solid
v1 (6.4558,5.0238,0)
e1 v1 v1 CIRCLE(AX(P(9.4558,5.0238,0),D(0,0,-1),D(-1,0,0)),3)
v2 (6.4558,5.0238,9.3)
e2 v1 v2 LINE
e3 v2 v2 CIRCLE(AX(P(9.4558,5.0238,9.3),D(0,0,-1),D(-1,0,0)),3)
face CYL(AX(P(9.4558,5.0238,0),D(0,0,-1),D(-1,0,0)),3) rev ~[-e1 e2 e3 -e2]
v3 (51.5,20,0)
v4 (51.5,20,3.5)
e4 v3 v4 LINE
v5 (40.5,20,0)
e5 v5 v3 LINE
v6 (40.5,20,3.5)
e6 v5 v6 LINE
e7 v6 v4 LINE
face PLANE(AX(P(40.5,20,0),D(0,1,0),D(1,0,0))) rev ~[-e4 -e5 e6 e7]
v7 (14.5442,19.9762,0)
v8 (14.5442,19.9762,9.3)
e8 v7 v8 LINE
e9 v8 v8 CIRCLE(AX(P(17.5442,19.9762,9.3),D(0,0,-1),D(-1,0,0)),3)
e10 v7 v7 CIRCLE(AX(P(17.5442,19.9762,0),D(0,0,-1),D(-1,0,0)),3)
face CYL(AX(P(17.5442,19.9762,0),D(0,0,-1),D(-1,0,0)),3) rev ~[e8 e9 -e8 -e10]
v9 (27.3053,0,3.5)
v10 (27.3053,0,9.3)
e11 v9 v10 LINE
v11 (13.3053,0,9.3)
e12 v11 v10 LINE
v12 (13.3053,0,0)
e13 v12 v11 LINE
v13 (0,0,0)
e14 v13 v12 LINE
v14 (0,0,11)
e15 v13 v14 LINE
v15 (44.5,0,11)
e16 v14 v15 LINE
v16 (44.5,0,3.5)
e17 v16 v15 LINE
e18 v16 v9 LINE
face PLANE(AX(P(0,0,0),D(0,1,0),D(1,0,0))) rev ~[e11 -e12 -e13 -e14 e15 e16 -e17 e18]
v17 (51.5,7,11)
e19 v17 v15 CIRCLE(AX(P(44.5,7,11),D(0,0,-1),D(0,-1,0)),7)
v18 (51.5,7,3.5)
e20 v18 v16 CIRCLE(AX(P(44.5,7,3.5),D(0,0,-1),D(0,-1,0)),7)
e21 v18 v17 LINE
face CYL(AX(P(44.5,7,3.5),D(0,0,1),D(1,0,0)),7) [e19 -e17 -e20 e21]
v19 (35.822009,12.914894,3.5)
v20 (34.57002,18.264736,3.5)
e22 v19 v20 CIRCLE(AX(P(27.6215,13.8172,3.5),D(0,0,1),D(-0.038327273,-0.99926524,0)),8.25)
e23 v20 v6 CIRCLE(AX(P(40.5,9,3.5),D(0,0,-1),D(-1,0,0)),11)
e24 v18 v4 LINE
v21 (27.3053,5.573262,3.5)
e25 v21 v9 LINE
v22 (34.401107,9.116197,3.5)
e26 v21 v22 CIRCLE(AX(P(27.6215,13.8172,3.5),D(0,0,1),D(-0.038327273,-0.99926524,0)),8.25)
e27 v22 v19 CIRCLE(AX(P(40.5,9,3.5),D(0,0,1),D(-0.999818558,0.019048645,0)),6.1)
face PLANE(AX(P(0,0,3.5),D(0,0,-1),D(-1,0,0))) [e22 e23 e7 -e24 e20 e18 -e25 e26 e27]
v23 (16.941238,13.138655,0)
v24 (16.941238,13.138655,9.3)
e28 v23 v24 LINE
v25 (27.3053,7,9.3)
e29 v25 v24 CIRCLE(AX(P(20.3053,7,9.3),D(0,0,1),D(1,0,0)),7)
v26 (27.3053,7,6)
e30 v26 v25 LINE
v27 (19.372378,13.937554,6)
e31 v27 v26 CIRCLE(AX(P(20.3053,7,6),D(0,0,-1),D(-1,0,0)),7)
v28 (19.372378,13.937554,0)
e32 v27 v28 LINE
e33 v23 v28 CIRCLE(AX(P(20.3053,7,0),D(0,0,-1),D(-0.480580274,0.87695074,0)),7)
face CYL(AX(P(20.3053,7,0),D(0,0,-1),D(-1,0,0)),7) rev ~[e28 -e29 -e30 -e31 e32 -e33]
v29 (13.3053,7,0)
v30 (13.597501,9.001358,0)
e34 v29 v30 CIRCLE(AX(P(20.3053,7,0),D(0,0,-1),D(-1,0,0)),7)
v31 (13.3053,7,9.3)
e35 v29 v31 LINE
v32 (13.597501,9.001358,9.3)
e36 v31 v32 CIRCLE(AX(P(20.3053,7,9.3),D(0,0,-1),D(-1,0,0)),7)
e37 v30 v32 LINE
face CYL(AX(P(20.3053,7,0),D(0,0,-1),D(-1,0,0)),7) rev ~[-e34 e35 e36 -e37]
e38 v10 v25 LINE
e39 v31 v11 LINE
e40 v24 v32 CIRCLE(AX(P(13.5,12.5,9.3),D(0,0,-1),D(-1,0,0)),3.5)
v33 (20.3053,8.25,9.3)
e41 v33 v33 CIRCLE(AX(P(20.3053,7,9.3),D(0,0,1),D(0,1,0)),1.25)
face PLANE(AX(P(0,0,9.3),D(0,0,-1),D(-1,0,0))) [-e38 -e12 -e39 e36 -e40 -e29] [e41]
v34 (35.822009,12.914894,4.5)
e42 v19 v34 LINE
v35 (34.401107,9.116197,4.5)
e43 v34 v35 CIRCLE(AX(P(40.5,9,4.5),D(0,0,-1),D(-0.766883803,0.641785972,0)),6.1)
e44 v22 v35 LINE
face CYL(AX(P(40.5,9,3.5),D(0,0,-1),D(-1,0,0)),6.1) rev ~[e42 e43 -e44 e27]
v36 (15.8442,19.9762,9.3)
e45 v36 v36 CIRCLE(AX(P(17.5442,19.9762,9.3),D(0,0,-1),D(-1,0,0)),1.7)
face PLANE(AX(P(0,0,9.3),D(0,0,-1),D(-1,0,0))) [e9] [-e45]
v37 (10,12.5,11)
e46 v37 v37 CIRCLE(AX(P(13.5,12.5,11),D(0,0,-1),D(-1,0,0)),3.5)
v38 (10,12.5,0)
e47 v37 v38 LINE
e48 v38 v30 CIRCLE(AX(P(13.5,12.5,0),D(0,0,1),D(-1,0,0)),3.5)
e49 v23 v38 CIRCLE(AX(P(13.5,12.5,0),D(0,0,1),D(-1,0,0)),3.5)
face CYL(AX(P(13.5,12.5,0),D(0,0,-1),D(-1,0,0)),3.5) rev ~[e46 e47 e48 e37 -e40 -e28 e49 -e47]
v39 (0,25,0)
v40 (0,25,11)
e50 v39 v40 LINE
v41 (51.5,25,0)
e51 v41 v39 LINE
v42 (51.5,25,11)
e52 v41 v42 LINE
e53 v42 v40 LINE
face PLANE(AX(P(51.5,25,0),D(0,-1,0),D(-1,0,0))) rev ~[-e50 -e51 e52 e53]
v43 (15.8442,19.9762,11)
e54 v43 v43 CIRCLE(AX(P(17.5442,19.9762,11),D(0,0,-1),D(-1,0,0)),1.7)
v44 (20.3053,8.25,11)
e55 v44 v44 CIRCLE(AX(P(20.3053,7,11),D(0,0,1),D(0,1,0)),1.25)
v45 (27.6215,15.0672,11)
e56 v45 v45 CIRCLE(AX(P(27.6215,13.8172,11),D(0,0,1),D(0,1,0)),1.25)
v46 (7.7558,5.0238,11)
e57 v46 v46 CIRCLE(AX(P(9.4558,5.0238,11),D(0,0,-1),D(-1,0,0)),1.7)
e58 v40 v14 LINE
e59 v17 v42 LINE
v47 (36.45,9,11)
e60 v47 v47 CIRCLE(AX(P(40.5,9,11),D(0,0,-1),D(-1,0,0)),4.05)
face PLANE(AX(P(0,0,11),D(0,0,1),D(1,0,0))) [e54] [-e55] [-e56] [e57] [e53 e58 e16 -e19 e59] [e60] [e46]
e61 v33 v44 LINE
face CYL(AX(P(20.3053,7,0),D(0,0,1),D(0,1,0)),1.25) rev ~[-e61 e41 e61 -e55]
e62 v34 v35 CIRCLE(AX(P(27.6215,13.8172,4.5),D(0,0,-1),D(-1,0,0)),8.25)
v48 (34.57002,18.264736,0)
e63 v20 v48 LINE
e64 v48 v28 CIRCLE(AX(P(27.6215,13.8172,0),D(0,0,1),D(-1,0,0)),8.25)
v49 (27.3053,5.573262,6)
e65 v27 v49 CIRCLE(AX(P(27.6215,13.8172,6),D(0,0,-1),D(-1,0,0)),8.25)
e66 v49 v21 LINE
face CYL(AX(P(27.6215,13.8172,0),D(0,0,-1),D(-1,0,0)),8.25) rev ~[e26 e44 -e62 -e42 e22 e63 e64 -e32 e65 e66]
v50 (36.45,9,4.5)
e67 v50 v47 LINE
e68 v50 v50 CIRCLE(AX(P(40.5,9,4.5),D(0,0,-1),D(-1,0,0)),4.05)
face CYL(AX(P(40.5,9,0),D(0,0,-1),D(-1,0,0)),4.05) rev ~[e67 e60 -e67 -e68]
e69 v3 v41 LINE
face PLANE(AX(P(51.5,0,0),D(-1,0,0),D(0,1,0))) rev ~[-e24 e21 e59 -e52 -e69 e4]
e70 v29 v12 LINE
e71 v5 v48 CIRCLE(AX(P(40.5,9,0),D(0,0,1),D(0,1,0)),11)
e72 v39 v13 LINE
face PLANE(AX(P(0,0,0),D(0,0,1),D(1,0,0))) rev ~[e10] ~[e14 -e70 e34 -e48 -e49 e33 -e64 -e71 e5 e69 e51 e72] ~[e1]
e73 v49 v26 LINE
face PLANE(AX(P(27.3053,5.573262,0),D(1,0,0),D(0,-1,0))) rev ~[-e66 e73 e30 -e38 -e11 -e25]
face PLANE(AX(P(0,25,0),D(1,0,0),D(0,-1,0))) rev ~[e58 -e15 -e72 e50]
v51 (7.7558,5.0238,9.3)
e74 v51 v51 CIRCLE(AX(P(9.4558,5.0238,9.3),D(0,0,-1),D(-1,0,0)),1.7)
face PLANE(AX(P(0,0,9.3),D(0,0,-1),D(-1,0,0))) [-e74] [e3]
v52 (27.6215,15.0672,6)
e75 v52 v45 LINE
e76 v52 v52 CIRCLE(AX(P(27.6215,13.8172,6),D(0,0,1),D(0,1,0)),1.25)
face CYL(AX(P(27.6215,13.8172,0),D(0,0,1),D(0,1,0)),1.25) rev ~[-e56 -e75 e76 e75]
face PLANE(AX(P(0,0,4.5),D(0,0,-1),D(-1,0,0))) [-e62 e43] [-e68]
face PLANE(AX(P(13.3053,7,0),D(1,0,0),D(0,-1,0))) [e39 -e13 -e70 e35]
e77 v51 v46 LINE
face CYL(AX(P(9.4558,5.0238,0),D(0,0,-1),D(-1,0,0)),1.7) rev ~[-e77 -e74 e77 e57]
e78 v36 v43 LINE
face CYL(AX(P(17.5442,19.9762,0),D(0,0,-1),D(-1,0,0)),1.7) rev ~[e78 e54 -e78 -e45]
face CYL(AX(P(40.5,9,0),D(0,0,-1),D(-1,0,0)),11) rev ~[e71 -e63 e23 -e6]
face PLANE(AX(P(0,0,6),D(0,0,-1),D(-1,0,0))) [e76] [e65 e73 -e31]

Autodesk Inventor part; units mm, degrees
ref_plane "YZ Plane" through (0, 0, 0) normal (1, 0, 0) x (0, 1, 0)
ref_plane "XZ Plane" through (0, 0, 0) normal (0, 1, 0) x (-1, 0, 0)
ref_plane "XY Plane" through (0, 0, 0) normal (0, 0, 1) x (1, 0, 0)
sketch "Sketch1" plane through (0, 0, 0) normal (0, 0, 1) x (1, 0, 0)
  line L0 (51.5, 25) -> (0, 25)
  line L1 (0, 25) -> (0, 0)
  line L2 (0, 0) -> (51.5, 0)
  line L3 (51.5, 0) -> (51.5, 25)
  point P0 (0, 12.5)
  dimension "d85" = 25
  dimension "d86" = 51.5
extrude "Bryla" add sketch "Sketch1" along normal blind 11
sketch "Sketch3" plane through (0, 0, 0) normal (0, 0, -1) x (-1, 0, 0)
  circle A0 centre (-13.5, 12.5) radius 3.5
  circle A1 centre (-20.3053, 7) radius 7
  circle A2 centre (-27.6215, 13.8172) radius 8.25
  circle A3 centre (-40.5, 9) radius 11
  circle A4 centre (-40.5, 9) radius 4.05
  circle A5 centre (-40.5, 9) radius 6.1
  line L0 (-13.5, 12.5) -> (-20.3053, 7) construction
  line L1 (-20.3053, 7) -> (-27.6215, 13.8172) construction
  line L2 (-27.6215, 13.8172) -> (-40.5, 9) construction
  line L3 (-17.5442, 19.9762) -> (-9.4558, 5.0238) construction
  circle A6 centre (-9.4558, 5.0238) radius 1.7
  circle A7 centre (-17.5442, 19.9762) radius 1.7
  circle A8 centre (-17.5442, 19.9762) radius 3
  circle A9 centre (-9.4558, 5.0238) radius 3
  line L4 (0, 0) -> (-51.5, 0) construction
  line L5 (-40.5, 20) -> (-51.5, 20)
  line L6 (-51.5, 20) -> (-51.5, 0)
  line L7 (0, 0) -> (-51.5, 0)
  line L8 (-46.8246, 0) -> (-51.5, 0)
  line L9 (-34.1754, 0) -> (-29.5, 0)
  line L10 (-29.5, 0) -> (-29.5, 9)
  line L11 (-27.3053, 7) -> (-27.3053, 0)
  line L12 (-13.3053, 7) -> (-13.3053, 0)
  line L13 (-29.5, 0) -> (-27.3053, 0)
  line L14 (-35.8715, 13.8172) -> (-35.8715, 0)
  line L15 (-51.5, 0) -> (0, 0) construction
  line L16 (0, 0) -> (0, 25) construction
  line L17 (0, 0) -> (-51.5, 0) construction
  line L18 (0, 25) -> (0, 0) construction
  line L19 (0, 25) -> (0, 0) construction
  line L20 (0, 0) -> (-51.5, 0) construction
  line L21 (-51.5, 25) -> (0, 25) construction
  line L22 (-51.5, 0) -> (-51.5, 25) construction
  line L23 (0, 0) -> (-51.5, 0) construction
  line L24 (0, 0) -> (-51.5, 0) construction
  point P0 (-34.4011, 9.1163)
  point P1 (-35.822, 12.9148)
  point P2 (-27.1598, 5.5801)
  point P3 (-22.8938, 18.8508)
  point P4 (-29.9455, 5.9013)
  point P5 (-23.4992, 20.9635)
  point P6 (-19.82, 16.5003)
  point P7 (-34.57, 18.2647)
  point P8 (-20.5208, 12.676)
  point P9 (-19.3723, 13.9375)
  point P10 (-23.9846, 12.9551)
  point P11 (-16.7322, 13.0194)
  point P12 (-1.1315, 7.6691)
  point P13 (-16.5069, 14.2913)
  point P14 (-10.2995, 13.9166)
  point P15 (-16.9412, 13.1386)
  point P16 (-6.1553, 9.4162)
  point P17 (-15.1313, 21.7589)
  point P18 (-16.1793, 22.6477)
  point P19 (-13.5975, 9.0014)
  point P20 (-29.5, 0)
  point P21 (-27.6754, 0)
  point P22 (-20.3053, 0)
  point P23 (-34.1754, 0)
  point P24 (-27.3053, 5.5733)
  point P25 (-29.5, 5.7839)
  point P26 (-51.5, 9)
  dimension "d20" = 7
  dimension "d21" = 14
  dimension "d22" = 16.5
  dimension "d23" = 22
  dimension "d24" = 12.2
  dimension "d25" = 8.1
  dimension "d26" = 8.75
  dimension "d27" = 10
  dimension "d28" = 13.75
  dimension "d59" = 6
  dimension "d60" = 3.4
  dimension "d61" = 17
  dimension "d66" = 12.5
  dimension "d69" = 9
  dimension "d83" = 13.5
  dimension "d87" = 11
extrude "Przelot" cut sketch "Sketch3" against normal through all contours A0 A1 | A1 A0 | A4 | A6 | A7
extrude "kolo3" cut sketch "Sketch3" against normal blind 3.5 contours A1 A0 | A3 A2 A5 | A2 L14 A5 L7 A3 | L11 L7 L10 A2 | A2 A5 L14 | L10 A2 A3 | A3 L6 L5 | L10 L7 A3 A2 | A5 A2 | A2 A5 L14 | L14 A5 | A3 L7 L14 A5 A2 | A3 L7 L6 | A3 L7 | A4 picked at (-14.968, 10.5481)
extrude "kolo1" cut sketch "Sketch3" against normal blind 9.3 contours A0 A1 | A1 A0 | A0 A1 A2 | A2 A1 | L12 L7 A1 | A1 A2 L11 | L7 L11 A2 A1
extrude "kolo2" cut sketch "Sketch3" against normal blind 6 contours A2 A1 | A1 L11 A2 L10 A3 | A1 A2 L11 | A3 A2 A5 | L10 A2 A3 | A5 A2
hole "osieMale" at (27.6215, 13.8172, 0) at (20.3053, 7, 0) direction (0, 0, 1) diameter 2.5 end through all
extrude "kolnierzLozyska" cut sketch "Sketch3" against normal blind 1 from surface at -3.5 contours A2 A5 L14 | L14 A5 picked at (-35.5053, 8.9668)
extrude "lbySrob" cut sketch "Sketch3" against normal up to surface (9.3 mm away) contours A6 | A7 | A8 | A9
fillet "Fillet1" radius 7 1 edges at (51.5, 0, 7.25)
properties part number "MocowaniePrzekladni_3DPrint"
